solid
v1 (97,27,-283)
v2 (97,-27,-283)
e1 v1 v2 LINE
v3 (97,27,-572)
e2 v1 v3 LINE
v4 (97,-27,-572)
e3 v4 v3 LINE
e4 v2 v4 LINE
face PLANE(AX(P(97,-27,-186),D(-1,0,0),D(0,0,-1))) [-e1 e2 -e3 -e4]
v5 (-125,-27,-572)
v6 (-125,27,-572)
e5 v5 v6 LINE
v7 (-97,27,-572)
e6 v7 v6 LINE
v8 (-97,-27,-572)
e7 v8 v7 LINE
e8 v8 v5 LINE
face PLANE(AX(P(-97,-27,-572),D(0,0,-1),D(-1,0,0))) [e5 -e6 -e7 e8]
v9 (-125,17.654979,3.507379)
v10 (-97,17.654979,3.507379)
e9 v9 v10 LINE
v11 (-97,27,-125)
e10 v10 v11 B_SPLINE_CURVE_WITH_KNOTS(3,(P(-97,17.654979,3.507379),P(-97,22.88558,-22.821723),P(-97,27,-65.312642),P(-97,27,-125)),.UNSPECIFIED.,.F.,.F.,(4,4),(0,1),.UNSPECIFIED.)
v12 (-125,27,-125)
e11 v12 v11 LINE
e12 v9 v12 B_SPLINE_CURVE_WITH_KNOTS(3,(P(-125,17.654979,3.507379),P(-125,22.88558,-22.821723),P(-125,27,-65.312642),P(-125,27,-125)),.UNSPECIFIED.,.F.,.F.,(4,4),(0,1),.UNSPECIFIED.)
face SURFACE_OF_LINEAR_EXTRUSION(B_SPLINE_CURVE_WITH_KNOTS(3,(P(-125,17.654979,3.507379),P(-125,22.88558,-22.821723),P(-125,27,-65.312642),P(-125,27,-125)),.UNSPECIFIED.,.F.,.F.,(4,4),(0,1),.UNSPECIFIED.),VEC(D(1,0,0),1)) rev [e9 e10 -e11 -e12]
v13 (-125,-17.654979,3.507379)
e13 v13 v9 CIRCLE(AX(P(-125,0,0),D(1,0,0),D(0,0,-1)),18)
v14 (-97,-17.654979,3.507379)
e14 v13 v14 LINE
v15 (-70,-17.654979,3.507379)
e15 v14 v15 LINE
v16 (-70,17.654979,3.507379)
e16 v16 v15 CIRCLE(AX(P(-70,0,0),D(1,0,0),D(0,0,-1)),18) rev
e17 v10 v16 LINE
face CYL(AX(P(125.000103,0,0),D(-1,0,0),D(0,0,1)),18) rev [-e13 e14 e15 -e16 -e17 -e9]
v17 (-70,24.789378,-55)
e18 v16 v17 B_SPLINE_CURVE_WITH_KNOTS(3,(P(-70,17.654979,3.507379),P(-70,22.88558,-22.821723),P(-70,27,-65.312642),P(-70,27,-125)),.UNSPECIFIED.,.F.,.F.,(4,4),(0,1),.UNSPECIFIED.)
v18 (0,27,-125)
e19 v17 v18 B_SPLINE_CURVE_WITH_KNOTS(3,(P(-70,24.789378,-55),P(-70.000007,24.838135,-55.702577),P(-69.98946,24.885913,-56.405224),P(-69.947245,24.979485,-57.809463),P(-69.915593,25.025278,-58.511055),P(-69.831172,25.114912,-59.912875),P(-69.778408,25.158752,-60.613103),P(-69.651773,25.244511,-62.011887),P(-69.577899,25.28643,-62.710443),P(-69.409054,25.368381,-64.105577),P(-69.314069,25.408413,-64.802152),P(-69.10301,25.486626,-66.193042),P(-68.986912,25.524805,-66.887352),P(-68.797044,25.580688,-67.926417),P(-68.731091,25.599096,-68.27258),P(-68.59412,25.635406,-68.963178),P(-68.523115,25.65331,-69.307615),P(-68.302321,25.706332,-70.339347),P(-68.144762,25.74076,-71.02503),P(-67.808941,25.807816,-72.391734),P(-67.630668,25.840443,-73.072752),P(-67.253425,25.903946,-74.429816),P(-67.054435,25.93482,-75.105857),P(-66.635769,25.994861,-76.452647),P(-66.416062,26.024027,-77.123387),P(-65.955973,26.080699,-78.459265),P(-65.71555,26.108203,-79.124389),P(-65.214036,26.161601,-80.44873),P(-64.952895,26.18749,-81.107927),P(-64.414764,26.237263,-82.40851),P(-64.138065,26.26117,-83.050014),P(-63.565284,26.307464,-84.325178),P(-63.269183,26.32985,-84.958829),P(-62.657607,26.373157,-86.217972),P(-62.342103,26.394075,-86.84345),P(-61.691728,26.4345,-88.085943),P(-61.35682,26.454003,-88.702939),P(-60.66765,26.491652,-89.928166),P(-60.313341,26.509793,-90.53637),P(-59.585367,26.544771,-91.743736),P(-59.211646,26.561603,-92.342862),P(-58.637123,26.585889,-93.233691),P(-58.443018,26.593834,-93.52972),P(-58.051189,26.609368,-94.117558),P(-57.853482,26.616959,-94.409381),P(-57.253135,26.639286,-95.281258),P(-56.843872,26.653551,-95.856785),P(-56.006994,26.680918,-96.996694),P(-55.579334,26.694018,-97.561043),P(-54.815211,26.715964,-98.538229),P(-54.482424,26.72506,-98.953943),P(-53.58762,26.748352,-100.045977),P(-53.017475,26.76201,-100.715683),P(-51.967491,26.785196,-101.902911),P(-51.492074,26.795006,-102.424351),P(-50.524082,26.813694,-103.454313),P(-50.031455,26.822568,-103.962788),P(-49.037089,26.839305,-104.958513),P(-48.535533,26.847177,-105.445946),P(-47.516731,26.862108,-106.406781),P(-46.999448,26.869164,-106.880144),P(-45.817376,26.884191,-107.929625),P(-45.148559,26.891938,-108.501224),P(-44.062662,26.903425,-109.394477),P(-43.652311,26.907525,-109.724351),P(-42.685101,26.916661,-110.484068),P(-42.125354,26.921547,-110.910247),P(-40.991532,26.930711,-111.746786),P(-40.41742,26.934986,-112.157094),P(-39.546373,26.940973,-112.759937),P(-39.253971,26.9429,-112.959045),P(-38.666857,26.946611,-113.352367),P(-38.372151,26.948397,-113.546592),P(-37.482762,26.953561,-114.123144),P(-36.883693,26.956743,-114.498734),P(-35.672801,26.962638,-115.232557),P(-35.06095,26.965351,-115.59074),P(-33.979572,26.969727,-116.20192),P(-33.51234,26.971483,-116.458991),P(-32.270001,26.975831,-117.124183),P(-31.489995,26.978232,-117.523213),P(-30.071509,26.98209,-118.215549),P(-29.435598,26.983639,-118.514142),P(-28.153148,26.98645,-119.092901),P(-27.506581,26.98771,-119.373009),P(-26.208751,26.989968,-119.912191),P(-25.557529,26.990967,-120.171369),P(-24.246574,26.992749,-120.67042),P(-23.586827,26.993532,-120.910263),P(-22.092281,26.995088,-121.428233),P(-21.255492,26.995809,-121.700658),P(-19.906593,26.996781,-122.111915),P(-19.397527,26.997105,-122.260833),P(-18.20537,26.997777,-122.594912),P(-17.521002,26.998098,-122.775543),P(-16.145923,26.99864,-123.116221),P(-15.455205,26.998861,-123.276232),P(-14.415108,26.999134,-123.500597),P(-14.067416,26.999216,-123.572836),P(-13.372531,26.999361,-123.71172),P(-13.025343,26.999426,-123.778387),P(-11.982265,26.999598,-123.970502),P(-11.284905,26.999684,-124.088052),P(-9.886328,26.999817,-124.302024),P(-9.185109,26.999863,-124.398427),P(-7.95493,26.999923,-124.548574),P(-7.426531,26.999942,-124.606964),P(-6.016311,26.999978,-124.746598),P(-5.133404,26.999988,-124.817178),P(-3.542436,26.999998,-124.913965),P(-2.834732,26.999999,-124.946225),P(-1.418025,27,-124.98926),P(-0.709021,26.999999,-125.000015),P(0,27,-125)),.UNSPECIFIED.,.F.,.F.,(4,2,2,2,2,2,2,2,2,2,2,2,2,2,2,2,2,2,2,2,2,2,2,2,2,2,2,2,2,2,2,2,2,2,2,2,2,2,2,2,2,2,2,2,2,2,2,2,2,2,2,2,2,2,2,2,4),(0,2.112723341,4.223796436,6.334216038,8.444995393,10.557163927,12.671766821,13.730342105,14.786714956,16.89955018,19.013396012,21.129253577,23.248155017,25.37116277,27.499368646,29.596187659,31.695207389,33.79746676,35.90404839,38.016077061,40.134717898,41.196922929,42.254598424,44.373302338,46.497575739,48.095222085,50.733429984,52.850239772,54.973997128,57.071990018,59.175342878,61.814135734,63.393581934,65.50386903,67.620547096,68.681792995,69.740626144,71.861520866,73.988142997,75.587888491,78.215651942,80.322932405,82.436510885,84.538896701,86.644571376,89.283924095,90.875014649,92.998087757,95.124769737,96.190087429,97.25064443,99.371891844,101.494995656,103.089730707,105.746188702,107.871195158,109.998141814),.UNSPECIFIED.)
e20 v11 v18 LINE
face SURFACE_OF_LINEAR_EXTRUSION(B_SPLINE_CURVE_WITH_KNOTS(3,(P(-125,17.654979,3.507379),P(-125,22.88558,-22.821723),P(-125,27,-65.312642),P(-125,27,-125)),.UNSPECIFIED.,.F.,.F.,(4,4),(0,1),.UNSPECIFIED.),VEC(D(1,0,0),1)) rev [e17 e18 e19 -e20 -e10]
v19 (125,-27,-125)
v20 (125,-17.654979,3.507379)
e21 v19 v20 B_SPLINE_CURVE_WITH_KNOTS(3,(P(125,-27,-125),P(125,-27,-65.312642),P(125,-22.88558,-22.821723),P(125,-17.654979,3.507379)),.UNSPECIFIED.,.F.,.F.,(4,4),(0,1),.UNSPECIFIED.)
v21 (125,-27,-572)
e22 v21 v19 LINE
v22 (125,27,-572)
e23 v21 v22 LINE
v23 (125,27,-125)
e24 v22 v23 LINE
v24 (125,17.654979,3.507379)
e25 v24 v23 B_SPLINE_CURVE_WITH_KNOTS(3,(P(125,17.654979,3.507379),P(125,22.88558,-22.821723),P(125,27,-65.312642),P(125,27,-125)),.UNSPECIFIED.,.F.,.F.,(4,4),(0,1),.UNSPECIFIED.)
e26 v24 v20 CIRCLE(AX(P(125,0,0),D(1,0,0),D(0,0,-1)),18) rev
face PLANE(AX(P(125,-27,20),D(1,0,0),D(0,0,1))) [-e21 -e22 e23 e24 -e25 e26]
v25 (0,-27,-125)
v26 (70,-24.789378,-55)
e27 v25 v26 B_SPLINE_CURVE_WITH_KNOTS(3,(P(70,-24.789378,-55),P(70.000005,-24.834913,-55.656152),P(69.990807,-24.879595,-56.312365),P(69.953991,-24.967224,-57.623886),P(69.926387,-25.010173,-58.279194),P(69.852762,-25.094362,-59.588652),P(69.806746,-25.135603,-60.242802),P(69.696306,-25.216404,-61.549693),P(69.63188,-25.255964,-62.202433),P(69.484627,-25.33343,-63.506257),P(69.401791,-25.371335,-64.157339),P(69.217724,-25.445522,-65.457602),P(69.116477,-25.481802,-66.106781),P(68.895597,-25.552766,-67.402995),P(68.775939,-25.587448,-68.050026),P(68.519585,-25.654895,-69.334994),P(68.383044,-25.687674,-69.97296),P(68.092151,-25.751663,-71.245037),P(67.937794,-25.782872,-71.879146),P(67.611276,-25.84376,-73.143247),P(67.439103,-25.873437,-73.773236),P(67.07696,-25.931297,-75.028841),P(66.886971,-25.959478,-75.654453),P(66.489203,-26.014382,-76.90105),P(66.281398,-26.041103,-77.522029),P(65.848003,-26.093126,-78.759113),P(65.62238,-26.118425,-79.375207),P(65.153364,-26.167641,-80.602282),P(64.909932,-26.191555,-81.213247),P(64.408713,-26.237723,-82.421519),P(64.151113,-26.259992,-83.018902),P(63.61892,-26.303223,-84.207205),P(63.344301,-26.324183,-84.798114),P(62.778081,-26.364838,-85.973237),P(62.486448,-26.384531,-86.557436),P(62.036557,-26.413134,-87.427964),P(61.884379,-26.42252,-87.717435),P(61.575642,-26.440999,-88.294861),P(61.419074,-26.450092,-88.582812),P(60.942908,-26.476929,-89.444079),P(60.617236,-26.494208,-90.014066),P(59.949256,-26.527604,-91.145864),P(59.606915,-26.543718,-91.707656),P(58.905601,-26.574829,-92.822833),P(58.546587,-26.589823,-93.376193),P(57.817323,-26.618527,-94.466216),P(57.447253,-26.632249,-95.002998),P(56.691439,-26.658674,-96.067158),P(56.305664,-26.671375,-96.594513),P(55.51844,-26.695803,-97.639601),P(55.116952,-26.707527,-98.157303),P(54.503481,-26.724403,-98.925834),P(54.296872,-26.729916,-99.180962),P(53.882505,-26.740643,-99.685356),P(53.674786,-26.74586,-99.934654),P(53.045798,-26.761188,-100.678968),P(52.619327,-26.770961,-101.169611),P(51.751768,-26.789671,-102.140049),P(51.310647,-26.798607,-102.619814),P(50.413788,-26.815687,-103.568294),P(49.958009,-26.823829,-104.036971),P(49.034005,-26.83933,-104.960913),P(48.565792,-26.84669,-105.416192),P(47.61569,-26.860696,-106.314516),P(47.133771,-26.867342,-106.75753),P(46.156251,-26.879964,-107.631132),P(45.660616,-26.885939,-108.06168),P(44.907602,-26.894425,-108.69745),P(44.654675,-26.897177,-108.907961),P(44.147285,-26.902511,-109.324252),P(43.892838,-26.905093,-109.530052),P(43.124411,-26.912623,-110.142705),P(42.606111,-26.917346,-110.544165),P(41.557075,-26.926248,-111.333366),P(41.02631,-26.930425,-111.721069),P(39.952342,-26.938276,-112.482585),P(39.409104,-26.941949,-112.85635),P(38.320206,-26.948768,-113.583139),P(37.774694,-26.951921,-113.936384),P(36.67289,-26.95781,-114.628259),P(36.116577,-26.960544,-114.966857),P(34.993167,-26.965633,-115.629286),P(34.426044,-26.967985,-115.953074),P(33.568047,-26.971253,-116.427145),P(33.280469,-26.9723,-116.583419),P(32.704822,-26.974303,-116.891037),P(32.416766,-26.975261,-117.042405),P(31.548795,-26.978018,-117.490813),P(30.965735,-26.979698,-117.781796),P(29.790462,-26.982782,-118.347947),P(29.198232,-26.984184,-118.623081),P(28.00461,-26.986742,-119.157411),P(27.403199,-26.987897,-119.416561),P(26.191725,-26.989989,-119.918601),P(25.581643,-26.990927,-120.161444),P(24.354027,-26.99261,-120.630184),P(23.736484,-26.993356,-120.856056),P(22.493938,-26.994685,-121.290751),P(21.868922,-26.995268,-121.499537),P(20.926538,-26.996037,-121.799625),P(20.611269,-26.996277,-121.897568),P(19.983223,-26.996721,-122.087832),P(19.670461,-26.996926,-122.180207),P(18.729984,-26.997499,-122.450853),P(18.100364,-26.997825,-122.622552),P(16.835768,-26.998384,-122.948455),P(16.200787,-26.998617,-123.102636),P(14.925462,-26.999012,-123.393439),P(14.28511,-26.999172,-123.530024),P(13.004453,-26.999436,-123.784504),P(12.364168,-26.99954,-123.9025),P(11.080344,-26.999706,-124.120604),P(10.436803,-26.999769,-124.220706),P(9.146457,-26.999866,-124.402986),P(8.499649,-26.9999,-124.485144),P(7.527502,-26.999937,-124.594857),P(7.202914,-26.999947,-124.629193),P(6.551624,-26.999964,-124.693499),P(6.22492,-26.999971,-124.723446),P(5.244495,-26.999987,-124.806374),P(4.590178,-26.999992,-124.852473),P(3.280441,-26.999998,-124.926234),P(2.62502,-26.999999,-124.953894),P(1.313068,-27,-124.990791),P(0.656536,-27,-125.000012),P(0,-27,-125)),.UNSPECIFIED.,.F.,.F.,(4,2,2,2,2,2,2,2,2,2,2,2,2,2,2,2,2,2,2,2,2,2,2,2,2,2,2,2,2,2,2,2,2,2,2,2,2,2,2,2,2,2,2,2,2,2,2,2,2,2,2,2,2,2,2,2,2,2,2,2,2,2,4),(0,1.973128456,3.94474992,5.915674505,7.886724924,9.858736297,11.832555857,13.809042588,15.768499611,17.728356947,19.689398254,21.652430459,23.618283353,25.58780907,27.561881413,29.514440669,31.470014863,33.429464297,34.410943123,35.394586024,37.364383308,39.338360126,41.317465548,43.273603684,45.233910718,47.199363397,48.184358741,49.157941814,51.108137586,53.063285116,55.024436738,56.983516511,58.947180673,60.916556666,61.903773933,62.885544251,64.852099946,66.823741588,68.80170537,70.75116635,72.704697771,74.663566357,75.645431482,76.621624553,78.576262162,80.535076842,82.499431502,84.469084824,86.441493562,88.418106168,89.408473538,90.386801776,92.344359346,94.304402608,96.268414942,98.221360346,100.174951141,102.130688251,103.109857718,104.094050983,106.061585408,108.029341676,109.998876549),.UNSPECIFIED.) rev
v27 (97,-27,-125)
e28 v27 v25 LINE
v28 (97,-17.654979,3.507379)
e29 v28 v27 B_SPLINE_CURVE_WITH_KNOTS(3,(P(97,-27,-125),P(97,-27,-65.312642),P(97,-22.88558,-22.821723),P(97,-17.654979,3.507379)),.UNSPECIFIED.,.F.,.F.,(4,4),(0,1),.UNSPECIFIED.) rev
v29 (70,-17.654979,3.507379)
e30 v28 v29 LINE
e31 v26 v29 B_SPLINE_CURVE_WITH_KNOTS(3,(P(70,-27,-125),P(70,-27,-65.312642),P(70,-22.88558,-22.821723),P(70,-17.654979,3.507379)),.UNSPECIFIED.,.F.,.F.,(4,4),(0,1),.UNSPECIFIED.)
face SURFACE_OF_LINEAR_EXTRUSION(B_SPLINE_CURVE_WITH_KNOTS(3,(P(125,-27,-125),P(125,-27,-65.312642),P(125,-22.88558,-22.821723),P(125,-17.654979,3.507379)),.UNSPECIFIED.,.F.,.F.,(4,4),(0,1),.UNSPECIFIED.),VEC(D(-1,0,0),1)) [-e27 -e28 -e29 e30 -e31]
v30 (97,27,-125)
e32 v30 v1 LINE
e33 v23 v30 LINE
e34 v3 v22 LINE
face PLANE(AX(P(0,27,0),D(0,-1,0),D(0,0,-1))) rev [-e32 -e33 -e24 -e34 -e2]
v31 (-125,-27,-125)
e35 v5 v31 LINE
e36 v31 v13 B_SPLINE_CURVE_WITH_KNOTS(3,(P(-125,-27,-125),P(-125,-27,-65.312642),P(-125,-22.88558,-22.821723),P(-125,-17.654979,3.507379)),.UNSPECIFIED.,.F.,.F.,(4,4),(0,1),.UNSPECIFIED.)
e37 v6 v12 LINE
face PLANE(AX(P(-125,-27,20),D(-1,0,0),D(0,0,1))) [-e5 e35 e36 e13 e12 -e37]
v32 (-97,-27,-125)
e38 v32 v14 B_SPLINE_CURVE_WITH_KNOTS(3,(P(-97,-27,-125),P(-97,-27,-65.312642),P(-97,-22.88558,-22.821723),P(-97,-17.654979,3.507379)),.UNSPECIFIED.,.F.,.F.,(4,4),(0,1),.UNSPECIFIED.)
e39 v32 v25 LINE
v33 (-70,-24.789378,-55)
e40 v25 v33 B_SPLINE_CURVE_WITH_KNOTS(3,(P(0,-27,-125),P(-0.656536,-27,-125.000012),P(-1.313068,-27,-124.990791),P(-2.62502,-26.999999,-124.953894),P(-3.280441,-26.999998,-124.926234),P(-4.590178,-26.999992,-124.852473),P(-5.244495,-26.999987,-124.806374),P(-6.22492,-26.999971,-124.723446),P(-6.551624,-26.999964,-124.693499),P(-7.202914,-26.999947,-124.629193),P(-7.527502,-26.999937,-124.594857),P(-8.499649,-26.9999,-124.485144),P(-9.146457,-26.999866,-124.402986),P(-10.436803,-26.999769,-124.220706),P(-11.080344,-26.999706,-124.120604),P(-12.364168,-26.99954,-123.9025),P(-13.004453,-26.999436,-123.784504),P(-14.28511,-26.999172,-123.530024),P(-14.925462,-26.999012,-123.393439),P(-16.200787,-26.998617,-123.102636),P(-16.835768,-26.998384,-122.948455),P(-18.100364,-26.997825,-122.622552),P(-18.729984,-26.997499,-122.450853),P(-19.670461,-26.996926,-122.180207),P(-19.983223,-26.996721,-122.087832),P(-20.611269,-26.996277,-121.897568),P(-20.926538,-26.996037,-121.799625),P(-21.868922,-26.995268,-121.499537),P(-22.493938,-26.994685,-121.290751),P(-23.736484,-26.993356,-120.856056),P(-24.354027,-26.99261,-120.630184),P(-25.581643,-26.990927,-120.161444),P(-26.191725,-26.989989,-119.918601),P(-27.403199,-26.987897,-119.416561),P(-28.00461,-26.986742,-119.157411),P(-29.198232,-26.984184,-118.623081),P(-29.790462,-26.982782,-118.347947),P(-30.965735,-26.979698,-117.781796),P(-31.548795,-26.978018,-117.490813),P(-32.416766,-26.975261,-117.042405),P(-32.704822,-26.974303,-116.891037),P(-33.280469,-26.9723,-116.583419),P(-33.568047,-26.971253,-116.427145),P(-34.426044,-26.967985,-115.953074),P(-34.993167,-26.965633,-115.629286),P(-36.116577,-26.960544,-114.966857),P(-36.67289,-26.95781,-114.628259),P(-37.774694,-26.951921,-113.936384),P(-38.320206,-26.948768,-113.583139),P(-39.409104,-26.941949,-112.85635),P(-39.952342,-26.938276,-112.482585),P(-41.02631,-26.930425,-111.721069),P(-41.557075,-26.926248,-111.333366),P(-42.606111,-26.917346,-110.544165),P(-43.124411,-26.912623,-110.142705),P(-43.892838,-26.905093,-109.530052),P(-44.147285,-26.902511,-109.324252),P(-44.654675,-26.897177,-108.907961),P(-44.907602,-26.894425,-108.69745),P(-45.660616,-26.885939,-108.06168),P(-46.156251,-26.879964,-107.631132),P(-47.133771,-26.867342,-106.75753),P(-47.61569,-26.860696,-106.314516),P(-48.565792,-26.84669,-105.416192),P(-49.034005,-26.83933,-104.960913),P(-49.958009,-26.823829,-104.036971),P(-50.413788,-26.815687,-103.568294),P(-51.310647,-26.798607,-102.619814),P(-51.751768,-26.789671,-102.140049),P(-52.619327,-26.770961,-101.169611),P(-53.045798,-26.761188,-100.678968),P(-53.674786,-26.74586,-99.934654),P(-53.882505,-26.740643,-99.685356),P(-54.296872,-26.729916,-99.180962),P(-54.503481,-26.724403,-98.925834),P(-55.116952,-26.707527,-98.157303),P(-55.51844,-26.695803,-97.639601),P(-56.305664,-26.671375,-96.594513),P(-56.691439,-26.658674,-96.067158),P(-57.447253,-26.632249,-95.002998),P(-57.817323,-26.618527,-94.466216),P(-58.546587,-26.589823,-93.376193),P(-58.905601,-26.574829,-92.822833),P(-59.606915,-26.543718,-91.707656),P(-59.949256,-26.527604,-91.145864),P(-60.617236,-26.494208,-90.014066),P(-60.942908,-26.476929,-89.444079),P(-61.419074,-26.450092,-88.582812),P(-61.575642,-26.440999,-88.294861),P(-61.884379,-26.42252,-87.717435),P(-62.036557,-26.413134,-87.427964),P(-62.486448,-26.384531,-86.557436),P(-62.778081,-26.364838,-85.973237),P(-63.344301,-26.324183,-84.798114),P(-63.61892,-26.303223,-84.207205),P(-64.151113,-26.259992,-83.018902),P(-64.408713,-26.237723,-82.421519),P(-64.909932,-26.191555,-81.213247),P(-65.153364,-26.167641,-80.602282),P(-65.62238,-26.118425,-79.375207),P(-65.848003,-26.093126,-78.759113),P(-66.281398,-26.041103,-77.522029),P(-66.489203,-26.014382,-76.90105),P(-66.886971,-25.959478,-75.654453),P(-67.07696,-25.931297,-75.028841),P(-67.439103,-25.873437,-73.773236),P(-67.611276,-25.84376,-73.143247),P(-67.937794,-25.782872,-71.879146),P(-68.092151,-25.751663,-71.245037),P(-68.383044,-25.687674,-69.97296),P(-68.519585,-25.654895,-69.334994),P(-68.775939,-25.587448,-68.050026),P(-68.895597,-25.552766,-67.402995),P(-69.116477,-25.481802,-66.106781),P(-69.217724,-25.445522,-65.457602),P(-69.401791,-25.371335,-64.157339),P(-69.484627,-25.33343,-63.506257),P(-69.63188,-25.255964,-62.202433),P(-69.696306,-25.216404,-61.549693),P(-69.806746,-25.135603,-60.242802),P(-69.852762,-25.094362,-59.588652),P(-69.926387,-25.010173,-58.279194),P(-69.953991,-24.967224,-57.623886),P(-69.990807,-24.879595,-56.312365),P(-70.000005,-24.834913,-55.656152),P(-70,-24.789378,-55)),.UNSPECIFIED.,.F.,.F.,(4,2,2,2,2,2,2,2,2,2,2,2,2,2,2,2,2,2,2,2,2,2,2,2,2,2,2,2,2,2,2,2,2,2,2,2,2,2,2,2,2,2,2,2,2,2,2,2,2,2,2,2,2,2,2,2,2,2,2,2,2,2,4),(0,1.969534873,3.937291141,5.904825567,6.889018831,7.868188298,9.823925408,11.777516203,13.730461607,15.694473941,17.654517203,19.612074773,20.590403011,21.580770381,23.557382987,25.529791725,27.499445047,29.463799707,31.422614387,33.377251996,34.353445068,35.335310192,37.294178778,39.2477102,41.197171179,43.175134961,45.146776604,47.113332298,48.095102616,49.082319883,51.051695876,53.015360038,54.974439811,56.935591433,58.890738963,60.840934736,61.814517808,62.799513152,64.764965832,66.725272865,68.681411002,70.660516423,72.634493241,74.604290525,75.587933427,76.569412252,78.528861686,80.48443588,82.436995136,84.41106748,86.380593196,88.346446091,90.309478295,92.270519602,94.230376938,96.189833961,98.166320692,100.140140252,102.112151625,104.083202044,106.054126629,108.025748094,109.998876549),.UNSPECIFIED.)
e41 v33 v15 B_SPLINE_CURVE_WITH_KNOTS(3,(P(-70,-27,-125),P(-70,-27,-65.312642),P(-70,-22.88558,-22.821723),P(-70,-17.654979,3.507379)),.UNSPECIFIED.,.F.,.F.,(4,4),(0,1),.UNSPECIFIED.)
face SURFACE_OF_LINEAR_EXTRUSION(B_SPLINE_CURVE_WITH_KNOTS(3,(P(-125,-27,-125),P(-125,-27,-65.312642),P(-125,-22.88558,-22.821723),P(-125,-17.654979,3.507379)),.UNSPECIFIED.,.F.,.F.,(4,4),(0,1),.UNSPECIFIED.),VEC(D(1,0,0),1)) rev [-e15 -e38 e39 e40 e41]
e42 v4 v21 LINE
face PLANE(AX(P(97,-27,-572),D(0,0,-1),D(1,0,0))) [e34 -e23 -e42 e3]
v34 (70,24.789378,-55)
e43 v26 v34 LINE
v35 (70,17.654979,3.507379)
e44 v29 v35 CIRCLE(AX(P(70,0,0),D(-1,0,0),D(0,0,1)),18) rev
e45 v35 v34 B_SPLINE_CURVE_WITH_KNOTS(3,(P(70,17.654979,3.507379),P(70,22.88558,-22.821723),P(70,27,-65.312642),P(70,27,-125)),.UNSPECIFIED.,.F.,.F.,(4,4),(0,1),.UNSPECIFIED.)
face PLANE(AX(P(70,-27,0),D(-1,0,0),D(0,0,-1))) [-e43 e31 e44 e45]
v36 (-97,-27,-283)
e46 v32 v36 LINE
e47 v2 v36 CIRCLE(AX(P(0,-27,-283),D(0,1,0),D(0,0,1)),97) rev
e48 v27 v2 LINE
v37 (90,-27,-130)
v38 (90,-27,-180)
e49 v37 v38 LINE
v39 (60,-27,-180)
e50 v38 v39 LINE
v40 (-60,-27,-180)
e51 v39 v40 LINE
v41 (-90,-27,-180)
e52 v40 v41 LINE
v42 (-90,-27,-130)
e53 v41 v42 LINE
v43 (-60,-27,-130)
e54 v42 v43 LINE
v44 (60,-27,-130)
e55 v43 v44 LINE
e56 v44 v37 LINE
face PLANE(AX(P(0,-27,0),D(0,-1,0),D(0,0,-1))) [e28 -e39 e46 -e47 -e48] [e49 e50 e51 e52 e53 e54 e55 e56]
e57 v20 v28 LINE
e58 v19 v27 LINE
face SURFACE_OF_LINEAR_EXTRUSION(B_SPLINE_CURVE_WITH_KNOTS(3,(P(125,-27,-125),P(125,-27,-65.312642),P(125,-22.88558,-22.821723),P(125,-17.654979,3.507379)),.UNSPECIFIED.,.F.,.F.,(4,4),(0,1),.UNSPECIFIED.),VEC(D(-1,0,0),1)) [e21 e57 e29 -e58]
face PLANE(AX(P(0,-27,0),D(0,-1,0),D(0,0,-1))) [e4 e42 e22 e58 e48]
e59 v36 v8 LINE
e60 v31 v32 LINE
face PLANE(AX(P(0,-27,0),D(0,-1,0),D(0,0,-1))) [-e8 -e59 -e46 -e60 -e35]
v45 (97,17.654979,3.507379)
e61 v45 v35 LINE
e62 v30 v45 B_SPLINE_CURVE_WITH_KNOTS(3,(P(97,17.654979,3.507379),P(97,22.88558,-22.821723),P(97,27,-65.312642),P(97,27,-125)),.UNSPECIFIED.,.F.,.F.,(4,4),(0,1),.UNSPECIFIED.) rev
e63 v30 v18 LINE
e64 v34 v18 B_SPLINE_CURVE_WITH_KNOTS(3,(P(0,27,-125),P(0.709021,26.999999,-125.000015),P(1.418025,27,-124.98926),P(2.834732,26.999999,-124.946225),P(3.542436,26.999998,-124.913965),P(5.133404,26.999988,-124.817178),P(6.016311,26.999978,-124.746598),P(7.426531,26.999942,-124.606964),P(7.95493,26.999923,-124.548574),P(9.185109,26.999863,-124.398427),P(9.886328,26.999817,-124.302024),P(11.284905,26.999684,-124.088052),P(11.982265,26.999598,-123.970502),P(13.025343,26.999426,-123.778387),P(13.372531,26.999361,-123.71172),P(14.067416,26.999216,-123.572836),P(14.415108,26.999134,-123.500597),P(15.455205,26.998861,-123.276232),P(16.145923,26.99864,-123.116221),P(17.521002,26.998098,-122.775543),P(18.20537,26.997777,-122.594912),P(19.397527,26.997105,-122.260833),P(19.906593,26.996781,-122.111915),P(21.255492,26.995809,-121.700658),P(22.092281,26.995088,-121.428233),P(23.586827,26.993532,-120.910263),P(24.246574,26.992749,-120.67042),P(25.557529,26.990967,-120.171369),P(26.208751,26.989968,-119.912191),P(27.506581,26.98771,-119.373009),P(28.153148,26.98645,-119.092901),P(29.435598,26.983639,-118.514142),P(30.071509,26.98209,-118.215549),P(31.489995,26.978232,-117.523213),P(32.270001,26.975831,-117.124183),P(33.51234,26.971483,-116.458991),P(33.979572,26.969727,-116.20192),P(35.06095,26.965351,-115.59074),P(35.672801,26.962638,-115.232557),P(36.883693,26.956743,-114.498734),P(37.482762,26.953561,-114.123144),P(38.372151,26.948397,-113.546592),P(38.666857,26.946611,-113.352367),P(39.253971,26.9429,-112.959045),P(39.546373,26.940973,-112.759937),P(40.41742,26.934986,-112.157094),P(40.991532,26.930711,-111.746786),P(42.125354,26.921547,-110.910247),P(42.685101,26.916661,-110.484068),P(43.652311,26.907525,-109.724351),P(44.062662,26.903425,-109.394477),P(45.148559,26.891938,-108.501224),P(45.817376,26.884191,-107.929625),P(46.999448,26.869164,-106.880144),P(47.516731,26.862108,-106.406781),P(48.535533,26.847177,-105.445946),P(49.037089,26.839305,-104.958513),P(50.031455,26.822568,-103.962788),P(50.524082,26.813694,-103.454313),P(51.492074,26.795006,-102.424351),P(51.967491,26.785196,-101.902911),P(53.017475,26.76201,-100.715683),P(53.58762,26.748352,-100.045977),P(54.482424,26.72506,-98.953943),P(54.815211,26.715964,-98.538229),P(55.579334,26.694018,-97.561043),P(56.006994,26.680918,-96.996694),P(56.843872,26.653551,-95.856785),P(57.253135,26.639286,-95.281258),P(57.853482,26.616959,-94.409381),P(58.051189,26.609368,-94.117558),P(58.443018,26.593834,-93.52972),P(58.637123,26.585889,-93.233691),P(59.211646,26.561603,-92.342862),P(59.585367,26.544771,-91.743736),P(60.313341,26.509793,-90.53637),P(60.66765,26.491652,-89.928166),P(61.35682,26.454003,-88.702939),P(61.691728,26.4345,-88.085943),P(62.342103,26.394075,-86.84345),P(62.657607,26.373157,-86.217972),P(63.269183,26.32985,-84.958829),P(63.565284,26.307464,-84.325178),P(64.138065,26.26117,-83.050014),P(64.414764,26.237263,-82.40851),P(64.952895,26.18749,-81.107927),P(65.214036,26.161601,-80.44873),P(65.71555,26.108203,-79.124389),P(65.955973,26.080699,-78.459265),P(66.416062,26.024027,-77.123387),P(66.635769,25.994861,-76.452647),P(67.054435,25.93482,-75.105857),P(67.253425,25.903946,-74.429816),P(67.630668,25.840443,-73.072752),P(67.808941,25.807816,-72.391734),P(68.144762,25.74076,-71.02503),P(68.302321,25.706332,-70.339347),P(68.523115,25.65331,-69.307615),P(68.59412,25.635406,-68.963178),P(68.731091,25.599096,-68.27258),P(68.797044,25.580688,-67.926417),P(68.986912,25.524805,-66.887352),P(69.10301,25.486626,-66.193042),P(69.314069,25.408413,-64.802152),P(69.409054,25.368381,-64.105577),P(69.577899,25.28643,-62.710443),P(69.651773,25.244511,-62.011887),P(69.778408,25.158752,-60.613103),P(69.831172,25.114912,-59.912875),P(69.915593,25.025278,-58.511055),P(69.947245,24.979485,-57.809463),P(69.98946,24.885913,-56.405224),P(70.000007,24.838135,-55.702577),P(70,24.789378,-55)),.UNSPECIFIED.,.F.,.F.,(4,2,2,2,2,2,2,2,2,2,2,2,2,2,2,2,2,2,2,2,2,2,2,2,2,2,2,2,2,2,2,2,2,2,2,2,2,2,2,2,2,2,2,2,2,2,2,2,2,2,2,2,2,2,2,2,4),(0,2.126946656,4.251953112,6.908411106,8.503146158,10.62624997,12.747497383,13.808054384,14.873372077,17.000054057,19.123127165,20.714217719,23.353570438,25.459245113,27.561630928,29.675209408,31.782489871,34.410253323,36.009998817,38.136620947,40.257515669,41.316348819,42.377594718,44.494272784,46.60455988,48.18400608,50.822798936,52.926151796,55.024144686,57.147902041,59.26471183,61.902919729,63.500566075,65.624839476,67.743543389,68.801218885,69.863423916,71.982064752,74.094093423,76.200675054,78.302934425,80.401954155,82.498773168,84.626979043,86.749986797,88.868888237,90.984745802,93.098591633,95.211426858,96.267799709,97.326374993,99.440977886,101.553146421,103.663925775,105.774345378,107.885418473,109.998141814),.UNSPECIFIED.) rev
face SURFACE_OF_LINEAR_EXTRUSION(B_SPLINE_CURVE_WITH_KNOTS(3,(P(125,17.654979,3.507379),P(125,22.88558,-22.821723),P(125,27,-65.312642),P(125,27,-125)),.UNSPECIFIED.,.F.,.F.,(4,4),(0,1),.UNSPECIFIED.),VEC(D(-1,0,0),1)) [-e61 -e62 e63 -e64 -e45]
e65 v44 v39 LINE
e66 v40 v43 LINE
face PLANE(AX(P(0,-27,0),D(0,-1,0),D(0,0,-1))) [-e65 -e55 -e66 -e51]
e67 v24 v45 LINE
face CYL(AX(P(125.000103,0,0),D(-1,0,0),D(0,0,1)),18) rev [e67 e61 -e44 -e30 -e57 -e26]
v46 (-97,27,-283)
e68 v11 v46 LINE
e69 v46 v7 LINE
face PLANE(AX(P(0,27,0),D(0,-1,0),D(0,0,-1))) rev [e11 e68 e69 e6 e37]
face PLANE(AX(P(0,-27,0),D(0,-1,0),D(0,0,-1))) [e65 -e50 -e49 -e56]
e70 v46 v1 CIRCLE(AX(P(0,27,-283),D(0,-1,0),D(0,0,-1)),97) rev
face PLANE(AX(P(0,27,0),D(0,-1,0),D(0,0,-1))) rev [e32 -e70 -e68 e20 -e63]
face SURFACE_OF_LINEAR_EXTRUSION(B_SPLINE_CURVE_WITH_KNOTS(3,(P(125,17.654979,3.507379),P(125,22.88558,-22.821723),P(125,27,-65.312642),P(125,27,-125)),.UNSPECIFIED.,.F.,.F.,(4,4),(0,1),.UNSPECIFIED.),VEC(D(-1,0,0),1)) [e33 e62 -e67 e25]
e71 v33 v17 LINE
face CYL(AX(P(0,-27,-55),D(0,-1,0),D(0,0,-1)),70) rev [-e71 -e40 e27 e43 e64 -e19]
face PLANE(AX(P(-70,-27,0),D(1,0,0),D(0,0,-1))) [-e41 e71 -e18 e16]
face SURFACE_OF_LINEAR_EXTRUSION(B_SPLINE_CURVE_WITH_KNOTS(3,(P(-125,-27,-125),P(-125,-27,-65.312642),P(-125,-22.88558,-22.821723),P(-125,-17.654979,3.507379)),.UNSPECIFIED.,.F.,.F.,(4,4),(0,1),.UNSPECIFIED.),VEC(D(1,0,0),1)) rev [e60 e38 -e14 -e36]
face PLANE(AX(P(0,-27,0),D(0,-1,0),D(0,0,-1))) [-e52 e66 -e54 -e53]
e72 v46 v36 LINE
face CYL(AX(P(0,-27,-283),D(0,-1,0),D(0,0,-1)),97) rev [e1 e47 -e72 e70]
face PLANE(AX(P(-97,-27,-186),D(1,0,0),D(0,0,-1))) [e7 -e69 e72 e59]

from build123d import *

# Parameters (mm, degrees)
POWIERZCHNIA_PO_CZ2_START   = -125
POWIERZCHNIA_PO_CZ2_DEPTH   = 125
POWIERZCHNIA_PO_CZ2_START_2 = -27
POWIERZCHNIA_PO_CZ2_2_DEPTH = 54
SZKIC4_R                    = 18
WYTNIJ_WYCI_GNI_CIE1_DEPTH  = 625.830377118


with BuildPart() as part:
    # Powierzchnia-Połącz2: read off the stored shape, not the designer's step
    # Powierzchnia-Połącz2 outline → Powierzchnia-Połącz2 (new body)
    with BuildSketch(Plane.YZ.offset(POWIERZCHNIA_PO_CZ2_START)):
        with BuildLine():
            add(Edge.make_bspline(
                [(-27, -125), (-27, -65.312641889), (-22.885580179, -22.821723351), (-17.654979183, 3.50737937)],
                knots=[0, 0, 0, 0, 1, 1, 1, 1], degree=3))
            Line((-27, -125), (-27, -572))
            Line((-27, -572), (27, -572))
            Line((27, -572), (27, -125))
            add(Edge.make_bspline(
                [(17.654979183, 3.50737937), (22.885580179, -22.821723351), (27, -65.312641889), (27, -125)],
                knots=[0, 0, 0, 0, 1, 1, 1, 1], degree=3))
            ThreePointArc((17.654979183, 3.50737937), (0, 18), (-17.654979183, 3.50737937))
        make_face()
    extrude(amount=POWIERZCHNIA_PO_CZ2_DEPTH)

    # Powierzchnia-Po_cz2 2 outline → Powierzchnia-Po_cz2 2 (cut)
    with BuildSketch(Plane(origin=(0, 0, 0), x_dir=(1, 0, 0), z_dir=(0, 1, 0)).offset(POWIERZCHNIA_PO_CZ2_START_2)):
        with BuildLine():
            Line((-70, 55), (-70, -20))
            Line((-70, -20), (0, -20))
            Line((0, -20), (0, 125))
            ThreePointArc((0, 125), (-49.497474683, 104.497474683), (-70, 55))
        make_face()
        with BuildLine():
            ThreePointArc((-97, 283), (-68.589357775, 214.410642225), (0, 186))
            Line((0, 186), (0, 572))
            Line((0, 572), (-97, 572))
            Line((-97, 572), (-97, 283))
        make_face()
    extrude(amount=POWIERZCHNIA_PO_CZ2_2_DEPTH, mode=Mode.SUBTRACT)

    # Lustro1: part across plane


with BuildPart() as part_1:
    add(part.part)
    add(part.part.mirror(Plane(origin=(0, 0, 0), x_dir=(0, 0, 1), z_dir=(1, 0, 0))))

    # Szkic4 → Wytnij-wyciągnięcie1 (cut, through all)
    with BuildSketch(Plane(origin=(-125, 0, 0), x_dir=(0, 0, -1), z_dir=(1, 0, 0))):
        Circle(SZKIC4_R)
    extrude(amount=WYTNIJ_WYCI_GNI_CIE1_DEPTH, mode=Mode.SUBTRACT)


solid = part_1.part
